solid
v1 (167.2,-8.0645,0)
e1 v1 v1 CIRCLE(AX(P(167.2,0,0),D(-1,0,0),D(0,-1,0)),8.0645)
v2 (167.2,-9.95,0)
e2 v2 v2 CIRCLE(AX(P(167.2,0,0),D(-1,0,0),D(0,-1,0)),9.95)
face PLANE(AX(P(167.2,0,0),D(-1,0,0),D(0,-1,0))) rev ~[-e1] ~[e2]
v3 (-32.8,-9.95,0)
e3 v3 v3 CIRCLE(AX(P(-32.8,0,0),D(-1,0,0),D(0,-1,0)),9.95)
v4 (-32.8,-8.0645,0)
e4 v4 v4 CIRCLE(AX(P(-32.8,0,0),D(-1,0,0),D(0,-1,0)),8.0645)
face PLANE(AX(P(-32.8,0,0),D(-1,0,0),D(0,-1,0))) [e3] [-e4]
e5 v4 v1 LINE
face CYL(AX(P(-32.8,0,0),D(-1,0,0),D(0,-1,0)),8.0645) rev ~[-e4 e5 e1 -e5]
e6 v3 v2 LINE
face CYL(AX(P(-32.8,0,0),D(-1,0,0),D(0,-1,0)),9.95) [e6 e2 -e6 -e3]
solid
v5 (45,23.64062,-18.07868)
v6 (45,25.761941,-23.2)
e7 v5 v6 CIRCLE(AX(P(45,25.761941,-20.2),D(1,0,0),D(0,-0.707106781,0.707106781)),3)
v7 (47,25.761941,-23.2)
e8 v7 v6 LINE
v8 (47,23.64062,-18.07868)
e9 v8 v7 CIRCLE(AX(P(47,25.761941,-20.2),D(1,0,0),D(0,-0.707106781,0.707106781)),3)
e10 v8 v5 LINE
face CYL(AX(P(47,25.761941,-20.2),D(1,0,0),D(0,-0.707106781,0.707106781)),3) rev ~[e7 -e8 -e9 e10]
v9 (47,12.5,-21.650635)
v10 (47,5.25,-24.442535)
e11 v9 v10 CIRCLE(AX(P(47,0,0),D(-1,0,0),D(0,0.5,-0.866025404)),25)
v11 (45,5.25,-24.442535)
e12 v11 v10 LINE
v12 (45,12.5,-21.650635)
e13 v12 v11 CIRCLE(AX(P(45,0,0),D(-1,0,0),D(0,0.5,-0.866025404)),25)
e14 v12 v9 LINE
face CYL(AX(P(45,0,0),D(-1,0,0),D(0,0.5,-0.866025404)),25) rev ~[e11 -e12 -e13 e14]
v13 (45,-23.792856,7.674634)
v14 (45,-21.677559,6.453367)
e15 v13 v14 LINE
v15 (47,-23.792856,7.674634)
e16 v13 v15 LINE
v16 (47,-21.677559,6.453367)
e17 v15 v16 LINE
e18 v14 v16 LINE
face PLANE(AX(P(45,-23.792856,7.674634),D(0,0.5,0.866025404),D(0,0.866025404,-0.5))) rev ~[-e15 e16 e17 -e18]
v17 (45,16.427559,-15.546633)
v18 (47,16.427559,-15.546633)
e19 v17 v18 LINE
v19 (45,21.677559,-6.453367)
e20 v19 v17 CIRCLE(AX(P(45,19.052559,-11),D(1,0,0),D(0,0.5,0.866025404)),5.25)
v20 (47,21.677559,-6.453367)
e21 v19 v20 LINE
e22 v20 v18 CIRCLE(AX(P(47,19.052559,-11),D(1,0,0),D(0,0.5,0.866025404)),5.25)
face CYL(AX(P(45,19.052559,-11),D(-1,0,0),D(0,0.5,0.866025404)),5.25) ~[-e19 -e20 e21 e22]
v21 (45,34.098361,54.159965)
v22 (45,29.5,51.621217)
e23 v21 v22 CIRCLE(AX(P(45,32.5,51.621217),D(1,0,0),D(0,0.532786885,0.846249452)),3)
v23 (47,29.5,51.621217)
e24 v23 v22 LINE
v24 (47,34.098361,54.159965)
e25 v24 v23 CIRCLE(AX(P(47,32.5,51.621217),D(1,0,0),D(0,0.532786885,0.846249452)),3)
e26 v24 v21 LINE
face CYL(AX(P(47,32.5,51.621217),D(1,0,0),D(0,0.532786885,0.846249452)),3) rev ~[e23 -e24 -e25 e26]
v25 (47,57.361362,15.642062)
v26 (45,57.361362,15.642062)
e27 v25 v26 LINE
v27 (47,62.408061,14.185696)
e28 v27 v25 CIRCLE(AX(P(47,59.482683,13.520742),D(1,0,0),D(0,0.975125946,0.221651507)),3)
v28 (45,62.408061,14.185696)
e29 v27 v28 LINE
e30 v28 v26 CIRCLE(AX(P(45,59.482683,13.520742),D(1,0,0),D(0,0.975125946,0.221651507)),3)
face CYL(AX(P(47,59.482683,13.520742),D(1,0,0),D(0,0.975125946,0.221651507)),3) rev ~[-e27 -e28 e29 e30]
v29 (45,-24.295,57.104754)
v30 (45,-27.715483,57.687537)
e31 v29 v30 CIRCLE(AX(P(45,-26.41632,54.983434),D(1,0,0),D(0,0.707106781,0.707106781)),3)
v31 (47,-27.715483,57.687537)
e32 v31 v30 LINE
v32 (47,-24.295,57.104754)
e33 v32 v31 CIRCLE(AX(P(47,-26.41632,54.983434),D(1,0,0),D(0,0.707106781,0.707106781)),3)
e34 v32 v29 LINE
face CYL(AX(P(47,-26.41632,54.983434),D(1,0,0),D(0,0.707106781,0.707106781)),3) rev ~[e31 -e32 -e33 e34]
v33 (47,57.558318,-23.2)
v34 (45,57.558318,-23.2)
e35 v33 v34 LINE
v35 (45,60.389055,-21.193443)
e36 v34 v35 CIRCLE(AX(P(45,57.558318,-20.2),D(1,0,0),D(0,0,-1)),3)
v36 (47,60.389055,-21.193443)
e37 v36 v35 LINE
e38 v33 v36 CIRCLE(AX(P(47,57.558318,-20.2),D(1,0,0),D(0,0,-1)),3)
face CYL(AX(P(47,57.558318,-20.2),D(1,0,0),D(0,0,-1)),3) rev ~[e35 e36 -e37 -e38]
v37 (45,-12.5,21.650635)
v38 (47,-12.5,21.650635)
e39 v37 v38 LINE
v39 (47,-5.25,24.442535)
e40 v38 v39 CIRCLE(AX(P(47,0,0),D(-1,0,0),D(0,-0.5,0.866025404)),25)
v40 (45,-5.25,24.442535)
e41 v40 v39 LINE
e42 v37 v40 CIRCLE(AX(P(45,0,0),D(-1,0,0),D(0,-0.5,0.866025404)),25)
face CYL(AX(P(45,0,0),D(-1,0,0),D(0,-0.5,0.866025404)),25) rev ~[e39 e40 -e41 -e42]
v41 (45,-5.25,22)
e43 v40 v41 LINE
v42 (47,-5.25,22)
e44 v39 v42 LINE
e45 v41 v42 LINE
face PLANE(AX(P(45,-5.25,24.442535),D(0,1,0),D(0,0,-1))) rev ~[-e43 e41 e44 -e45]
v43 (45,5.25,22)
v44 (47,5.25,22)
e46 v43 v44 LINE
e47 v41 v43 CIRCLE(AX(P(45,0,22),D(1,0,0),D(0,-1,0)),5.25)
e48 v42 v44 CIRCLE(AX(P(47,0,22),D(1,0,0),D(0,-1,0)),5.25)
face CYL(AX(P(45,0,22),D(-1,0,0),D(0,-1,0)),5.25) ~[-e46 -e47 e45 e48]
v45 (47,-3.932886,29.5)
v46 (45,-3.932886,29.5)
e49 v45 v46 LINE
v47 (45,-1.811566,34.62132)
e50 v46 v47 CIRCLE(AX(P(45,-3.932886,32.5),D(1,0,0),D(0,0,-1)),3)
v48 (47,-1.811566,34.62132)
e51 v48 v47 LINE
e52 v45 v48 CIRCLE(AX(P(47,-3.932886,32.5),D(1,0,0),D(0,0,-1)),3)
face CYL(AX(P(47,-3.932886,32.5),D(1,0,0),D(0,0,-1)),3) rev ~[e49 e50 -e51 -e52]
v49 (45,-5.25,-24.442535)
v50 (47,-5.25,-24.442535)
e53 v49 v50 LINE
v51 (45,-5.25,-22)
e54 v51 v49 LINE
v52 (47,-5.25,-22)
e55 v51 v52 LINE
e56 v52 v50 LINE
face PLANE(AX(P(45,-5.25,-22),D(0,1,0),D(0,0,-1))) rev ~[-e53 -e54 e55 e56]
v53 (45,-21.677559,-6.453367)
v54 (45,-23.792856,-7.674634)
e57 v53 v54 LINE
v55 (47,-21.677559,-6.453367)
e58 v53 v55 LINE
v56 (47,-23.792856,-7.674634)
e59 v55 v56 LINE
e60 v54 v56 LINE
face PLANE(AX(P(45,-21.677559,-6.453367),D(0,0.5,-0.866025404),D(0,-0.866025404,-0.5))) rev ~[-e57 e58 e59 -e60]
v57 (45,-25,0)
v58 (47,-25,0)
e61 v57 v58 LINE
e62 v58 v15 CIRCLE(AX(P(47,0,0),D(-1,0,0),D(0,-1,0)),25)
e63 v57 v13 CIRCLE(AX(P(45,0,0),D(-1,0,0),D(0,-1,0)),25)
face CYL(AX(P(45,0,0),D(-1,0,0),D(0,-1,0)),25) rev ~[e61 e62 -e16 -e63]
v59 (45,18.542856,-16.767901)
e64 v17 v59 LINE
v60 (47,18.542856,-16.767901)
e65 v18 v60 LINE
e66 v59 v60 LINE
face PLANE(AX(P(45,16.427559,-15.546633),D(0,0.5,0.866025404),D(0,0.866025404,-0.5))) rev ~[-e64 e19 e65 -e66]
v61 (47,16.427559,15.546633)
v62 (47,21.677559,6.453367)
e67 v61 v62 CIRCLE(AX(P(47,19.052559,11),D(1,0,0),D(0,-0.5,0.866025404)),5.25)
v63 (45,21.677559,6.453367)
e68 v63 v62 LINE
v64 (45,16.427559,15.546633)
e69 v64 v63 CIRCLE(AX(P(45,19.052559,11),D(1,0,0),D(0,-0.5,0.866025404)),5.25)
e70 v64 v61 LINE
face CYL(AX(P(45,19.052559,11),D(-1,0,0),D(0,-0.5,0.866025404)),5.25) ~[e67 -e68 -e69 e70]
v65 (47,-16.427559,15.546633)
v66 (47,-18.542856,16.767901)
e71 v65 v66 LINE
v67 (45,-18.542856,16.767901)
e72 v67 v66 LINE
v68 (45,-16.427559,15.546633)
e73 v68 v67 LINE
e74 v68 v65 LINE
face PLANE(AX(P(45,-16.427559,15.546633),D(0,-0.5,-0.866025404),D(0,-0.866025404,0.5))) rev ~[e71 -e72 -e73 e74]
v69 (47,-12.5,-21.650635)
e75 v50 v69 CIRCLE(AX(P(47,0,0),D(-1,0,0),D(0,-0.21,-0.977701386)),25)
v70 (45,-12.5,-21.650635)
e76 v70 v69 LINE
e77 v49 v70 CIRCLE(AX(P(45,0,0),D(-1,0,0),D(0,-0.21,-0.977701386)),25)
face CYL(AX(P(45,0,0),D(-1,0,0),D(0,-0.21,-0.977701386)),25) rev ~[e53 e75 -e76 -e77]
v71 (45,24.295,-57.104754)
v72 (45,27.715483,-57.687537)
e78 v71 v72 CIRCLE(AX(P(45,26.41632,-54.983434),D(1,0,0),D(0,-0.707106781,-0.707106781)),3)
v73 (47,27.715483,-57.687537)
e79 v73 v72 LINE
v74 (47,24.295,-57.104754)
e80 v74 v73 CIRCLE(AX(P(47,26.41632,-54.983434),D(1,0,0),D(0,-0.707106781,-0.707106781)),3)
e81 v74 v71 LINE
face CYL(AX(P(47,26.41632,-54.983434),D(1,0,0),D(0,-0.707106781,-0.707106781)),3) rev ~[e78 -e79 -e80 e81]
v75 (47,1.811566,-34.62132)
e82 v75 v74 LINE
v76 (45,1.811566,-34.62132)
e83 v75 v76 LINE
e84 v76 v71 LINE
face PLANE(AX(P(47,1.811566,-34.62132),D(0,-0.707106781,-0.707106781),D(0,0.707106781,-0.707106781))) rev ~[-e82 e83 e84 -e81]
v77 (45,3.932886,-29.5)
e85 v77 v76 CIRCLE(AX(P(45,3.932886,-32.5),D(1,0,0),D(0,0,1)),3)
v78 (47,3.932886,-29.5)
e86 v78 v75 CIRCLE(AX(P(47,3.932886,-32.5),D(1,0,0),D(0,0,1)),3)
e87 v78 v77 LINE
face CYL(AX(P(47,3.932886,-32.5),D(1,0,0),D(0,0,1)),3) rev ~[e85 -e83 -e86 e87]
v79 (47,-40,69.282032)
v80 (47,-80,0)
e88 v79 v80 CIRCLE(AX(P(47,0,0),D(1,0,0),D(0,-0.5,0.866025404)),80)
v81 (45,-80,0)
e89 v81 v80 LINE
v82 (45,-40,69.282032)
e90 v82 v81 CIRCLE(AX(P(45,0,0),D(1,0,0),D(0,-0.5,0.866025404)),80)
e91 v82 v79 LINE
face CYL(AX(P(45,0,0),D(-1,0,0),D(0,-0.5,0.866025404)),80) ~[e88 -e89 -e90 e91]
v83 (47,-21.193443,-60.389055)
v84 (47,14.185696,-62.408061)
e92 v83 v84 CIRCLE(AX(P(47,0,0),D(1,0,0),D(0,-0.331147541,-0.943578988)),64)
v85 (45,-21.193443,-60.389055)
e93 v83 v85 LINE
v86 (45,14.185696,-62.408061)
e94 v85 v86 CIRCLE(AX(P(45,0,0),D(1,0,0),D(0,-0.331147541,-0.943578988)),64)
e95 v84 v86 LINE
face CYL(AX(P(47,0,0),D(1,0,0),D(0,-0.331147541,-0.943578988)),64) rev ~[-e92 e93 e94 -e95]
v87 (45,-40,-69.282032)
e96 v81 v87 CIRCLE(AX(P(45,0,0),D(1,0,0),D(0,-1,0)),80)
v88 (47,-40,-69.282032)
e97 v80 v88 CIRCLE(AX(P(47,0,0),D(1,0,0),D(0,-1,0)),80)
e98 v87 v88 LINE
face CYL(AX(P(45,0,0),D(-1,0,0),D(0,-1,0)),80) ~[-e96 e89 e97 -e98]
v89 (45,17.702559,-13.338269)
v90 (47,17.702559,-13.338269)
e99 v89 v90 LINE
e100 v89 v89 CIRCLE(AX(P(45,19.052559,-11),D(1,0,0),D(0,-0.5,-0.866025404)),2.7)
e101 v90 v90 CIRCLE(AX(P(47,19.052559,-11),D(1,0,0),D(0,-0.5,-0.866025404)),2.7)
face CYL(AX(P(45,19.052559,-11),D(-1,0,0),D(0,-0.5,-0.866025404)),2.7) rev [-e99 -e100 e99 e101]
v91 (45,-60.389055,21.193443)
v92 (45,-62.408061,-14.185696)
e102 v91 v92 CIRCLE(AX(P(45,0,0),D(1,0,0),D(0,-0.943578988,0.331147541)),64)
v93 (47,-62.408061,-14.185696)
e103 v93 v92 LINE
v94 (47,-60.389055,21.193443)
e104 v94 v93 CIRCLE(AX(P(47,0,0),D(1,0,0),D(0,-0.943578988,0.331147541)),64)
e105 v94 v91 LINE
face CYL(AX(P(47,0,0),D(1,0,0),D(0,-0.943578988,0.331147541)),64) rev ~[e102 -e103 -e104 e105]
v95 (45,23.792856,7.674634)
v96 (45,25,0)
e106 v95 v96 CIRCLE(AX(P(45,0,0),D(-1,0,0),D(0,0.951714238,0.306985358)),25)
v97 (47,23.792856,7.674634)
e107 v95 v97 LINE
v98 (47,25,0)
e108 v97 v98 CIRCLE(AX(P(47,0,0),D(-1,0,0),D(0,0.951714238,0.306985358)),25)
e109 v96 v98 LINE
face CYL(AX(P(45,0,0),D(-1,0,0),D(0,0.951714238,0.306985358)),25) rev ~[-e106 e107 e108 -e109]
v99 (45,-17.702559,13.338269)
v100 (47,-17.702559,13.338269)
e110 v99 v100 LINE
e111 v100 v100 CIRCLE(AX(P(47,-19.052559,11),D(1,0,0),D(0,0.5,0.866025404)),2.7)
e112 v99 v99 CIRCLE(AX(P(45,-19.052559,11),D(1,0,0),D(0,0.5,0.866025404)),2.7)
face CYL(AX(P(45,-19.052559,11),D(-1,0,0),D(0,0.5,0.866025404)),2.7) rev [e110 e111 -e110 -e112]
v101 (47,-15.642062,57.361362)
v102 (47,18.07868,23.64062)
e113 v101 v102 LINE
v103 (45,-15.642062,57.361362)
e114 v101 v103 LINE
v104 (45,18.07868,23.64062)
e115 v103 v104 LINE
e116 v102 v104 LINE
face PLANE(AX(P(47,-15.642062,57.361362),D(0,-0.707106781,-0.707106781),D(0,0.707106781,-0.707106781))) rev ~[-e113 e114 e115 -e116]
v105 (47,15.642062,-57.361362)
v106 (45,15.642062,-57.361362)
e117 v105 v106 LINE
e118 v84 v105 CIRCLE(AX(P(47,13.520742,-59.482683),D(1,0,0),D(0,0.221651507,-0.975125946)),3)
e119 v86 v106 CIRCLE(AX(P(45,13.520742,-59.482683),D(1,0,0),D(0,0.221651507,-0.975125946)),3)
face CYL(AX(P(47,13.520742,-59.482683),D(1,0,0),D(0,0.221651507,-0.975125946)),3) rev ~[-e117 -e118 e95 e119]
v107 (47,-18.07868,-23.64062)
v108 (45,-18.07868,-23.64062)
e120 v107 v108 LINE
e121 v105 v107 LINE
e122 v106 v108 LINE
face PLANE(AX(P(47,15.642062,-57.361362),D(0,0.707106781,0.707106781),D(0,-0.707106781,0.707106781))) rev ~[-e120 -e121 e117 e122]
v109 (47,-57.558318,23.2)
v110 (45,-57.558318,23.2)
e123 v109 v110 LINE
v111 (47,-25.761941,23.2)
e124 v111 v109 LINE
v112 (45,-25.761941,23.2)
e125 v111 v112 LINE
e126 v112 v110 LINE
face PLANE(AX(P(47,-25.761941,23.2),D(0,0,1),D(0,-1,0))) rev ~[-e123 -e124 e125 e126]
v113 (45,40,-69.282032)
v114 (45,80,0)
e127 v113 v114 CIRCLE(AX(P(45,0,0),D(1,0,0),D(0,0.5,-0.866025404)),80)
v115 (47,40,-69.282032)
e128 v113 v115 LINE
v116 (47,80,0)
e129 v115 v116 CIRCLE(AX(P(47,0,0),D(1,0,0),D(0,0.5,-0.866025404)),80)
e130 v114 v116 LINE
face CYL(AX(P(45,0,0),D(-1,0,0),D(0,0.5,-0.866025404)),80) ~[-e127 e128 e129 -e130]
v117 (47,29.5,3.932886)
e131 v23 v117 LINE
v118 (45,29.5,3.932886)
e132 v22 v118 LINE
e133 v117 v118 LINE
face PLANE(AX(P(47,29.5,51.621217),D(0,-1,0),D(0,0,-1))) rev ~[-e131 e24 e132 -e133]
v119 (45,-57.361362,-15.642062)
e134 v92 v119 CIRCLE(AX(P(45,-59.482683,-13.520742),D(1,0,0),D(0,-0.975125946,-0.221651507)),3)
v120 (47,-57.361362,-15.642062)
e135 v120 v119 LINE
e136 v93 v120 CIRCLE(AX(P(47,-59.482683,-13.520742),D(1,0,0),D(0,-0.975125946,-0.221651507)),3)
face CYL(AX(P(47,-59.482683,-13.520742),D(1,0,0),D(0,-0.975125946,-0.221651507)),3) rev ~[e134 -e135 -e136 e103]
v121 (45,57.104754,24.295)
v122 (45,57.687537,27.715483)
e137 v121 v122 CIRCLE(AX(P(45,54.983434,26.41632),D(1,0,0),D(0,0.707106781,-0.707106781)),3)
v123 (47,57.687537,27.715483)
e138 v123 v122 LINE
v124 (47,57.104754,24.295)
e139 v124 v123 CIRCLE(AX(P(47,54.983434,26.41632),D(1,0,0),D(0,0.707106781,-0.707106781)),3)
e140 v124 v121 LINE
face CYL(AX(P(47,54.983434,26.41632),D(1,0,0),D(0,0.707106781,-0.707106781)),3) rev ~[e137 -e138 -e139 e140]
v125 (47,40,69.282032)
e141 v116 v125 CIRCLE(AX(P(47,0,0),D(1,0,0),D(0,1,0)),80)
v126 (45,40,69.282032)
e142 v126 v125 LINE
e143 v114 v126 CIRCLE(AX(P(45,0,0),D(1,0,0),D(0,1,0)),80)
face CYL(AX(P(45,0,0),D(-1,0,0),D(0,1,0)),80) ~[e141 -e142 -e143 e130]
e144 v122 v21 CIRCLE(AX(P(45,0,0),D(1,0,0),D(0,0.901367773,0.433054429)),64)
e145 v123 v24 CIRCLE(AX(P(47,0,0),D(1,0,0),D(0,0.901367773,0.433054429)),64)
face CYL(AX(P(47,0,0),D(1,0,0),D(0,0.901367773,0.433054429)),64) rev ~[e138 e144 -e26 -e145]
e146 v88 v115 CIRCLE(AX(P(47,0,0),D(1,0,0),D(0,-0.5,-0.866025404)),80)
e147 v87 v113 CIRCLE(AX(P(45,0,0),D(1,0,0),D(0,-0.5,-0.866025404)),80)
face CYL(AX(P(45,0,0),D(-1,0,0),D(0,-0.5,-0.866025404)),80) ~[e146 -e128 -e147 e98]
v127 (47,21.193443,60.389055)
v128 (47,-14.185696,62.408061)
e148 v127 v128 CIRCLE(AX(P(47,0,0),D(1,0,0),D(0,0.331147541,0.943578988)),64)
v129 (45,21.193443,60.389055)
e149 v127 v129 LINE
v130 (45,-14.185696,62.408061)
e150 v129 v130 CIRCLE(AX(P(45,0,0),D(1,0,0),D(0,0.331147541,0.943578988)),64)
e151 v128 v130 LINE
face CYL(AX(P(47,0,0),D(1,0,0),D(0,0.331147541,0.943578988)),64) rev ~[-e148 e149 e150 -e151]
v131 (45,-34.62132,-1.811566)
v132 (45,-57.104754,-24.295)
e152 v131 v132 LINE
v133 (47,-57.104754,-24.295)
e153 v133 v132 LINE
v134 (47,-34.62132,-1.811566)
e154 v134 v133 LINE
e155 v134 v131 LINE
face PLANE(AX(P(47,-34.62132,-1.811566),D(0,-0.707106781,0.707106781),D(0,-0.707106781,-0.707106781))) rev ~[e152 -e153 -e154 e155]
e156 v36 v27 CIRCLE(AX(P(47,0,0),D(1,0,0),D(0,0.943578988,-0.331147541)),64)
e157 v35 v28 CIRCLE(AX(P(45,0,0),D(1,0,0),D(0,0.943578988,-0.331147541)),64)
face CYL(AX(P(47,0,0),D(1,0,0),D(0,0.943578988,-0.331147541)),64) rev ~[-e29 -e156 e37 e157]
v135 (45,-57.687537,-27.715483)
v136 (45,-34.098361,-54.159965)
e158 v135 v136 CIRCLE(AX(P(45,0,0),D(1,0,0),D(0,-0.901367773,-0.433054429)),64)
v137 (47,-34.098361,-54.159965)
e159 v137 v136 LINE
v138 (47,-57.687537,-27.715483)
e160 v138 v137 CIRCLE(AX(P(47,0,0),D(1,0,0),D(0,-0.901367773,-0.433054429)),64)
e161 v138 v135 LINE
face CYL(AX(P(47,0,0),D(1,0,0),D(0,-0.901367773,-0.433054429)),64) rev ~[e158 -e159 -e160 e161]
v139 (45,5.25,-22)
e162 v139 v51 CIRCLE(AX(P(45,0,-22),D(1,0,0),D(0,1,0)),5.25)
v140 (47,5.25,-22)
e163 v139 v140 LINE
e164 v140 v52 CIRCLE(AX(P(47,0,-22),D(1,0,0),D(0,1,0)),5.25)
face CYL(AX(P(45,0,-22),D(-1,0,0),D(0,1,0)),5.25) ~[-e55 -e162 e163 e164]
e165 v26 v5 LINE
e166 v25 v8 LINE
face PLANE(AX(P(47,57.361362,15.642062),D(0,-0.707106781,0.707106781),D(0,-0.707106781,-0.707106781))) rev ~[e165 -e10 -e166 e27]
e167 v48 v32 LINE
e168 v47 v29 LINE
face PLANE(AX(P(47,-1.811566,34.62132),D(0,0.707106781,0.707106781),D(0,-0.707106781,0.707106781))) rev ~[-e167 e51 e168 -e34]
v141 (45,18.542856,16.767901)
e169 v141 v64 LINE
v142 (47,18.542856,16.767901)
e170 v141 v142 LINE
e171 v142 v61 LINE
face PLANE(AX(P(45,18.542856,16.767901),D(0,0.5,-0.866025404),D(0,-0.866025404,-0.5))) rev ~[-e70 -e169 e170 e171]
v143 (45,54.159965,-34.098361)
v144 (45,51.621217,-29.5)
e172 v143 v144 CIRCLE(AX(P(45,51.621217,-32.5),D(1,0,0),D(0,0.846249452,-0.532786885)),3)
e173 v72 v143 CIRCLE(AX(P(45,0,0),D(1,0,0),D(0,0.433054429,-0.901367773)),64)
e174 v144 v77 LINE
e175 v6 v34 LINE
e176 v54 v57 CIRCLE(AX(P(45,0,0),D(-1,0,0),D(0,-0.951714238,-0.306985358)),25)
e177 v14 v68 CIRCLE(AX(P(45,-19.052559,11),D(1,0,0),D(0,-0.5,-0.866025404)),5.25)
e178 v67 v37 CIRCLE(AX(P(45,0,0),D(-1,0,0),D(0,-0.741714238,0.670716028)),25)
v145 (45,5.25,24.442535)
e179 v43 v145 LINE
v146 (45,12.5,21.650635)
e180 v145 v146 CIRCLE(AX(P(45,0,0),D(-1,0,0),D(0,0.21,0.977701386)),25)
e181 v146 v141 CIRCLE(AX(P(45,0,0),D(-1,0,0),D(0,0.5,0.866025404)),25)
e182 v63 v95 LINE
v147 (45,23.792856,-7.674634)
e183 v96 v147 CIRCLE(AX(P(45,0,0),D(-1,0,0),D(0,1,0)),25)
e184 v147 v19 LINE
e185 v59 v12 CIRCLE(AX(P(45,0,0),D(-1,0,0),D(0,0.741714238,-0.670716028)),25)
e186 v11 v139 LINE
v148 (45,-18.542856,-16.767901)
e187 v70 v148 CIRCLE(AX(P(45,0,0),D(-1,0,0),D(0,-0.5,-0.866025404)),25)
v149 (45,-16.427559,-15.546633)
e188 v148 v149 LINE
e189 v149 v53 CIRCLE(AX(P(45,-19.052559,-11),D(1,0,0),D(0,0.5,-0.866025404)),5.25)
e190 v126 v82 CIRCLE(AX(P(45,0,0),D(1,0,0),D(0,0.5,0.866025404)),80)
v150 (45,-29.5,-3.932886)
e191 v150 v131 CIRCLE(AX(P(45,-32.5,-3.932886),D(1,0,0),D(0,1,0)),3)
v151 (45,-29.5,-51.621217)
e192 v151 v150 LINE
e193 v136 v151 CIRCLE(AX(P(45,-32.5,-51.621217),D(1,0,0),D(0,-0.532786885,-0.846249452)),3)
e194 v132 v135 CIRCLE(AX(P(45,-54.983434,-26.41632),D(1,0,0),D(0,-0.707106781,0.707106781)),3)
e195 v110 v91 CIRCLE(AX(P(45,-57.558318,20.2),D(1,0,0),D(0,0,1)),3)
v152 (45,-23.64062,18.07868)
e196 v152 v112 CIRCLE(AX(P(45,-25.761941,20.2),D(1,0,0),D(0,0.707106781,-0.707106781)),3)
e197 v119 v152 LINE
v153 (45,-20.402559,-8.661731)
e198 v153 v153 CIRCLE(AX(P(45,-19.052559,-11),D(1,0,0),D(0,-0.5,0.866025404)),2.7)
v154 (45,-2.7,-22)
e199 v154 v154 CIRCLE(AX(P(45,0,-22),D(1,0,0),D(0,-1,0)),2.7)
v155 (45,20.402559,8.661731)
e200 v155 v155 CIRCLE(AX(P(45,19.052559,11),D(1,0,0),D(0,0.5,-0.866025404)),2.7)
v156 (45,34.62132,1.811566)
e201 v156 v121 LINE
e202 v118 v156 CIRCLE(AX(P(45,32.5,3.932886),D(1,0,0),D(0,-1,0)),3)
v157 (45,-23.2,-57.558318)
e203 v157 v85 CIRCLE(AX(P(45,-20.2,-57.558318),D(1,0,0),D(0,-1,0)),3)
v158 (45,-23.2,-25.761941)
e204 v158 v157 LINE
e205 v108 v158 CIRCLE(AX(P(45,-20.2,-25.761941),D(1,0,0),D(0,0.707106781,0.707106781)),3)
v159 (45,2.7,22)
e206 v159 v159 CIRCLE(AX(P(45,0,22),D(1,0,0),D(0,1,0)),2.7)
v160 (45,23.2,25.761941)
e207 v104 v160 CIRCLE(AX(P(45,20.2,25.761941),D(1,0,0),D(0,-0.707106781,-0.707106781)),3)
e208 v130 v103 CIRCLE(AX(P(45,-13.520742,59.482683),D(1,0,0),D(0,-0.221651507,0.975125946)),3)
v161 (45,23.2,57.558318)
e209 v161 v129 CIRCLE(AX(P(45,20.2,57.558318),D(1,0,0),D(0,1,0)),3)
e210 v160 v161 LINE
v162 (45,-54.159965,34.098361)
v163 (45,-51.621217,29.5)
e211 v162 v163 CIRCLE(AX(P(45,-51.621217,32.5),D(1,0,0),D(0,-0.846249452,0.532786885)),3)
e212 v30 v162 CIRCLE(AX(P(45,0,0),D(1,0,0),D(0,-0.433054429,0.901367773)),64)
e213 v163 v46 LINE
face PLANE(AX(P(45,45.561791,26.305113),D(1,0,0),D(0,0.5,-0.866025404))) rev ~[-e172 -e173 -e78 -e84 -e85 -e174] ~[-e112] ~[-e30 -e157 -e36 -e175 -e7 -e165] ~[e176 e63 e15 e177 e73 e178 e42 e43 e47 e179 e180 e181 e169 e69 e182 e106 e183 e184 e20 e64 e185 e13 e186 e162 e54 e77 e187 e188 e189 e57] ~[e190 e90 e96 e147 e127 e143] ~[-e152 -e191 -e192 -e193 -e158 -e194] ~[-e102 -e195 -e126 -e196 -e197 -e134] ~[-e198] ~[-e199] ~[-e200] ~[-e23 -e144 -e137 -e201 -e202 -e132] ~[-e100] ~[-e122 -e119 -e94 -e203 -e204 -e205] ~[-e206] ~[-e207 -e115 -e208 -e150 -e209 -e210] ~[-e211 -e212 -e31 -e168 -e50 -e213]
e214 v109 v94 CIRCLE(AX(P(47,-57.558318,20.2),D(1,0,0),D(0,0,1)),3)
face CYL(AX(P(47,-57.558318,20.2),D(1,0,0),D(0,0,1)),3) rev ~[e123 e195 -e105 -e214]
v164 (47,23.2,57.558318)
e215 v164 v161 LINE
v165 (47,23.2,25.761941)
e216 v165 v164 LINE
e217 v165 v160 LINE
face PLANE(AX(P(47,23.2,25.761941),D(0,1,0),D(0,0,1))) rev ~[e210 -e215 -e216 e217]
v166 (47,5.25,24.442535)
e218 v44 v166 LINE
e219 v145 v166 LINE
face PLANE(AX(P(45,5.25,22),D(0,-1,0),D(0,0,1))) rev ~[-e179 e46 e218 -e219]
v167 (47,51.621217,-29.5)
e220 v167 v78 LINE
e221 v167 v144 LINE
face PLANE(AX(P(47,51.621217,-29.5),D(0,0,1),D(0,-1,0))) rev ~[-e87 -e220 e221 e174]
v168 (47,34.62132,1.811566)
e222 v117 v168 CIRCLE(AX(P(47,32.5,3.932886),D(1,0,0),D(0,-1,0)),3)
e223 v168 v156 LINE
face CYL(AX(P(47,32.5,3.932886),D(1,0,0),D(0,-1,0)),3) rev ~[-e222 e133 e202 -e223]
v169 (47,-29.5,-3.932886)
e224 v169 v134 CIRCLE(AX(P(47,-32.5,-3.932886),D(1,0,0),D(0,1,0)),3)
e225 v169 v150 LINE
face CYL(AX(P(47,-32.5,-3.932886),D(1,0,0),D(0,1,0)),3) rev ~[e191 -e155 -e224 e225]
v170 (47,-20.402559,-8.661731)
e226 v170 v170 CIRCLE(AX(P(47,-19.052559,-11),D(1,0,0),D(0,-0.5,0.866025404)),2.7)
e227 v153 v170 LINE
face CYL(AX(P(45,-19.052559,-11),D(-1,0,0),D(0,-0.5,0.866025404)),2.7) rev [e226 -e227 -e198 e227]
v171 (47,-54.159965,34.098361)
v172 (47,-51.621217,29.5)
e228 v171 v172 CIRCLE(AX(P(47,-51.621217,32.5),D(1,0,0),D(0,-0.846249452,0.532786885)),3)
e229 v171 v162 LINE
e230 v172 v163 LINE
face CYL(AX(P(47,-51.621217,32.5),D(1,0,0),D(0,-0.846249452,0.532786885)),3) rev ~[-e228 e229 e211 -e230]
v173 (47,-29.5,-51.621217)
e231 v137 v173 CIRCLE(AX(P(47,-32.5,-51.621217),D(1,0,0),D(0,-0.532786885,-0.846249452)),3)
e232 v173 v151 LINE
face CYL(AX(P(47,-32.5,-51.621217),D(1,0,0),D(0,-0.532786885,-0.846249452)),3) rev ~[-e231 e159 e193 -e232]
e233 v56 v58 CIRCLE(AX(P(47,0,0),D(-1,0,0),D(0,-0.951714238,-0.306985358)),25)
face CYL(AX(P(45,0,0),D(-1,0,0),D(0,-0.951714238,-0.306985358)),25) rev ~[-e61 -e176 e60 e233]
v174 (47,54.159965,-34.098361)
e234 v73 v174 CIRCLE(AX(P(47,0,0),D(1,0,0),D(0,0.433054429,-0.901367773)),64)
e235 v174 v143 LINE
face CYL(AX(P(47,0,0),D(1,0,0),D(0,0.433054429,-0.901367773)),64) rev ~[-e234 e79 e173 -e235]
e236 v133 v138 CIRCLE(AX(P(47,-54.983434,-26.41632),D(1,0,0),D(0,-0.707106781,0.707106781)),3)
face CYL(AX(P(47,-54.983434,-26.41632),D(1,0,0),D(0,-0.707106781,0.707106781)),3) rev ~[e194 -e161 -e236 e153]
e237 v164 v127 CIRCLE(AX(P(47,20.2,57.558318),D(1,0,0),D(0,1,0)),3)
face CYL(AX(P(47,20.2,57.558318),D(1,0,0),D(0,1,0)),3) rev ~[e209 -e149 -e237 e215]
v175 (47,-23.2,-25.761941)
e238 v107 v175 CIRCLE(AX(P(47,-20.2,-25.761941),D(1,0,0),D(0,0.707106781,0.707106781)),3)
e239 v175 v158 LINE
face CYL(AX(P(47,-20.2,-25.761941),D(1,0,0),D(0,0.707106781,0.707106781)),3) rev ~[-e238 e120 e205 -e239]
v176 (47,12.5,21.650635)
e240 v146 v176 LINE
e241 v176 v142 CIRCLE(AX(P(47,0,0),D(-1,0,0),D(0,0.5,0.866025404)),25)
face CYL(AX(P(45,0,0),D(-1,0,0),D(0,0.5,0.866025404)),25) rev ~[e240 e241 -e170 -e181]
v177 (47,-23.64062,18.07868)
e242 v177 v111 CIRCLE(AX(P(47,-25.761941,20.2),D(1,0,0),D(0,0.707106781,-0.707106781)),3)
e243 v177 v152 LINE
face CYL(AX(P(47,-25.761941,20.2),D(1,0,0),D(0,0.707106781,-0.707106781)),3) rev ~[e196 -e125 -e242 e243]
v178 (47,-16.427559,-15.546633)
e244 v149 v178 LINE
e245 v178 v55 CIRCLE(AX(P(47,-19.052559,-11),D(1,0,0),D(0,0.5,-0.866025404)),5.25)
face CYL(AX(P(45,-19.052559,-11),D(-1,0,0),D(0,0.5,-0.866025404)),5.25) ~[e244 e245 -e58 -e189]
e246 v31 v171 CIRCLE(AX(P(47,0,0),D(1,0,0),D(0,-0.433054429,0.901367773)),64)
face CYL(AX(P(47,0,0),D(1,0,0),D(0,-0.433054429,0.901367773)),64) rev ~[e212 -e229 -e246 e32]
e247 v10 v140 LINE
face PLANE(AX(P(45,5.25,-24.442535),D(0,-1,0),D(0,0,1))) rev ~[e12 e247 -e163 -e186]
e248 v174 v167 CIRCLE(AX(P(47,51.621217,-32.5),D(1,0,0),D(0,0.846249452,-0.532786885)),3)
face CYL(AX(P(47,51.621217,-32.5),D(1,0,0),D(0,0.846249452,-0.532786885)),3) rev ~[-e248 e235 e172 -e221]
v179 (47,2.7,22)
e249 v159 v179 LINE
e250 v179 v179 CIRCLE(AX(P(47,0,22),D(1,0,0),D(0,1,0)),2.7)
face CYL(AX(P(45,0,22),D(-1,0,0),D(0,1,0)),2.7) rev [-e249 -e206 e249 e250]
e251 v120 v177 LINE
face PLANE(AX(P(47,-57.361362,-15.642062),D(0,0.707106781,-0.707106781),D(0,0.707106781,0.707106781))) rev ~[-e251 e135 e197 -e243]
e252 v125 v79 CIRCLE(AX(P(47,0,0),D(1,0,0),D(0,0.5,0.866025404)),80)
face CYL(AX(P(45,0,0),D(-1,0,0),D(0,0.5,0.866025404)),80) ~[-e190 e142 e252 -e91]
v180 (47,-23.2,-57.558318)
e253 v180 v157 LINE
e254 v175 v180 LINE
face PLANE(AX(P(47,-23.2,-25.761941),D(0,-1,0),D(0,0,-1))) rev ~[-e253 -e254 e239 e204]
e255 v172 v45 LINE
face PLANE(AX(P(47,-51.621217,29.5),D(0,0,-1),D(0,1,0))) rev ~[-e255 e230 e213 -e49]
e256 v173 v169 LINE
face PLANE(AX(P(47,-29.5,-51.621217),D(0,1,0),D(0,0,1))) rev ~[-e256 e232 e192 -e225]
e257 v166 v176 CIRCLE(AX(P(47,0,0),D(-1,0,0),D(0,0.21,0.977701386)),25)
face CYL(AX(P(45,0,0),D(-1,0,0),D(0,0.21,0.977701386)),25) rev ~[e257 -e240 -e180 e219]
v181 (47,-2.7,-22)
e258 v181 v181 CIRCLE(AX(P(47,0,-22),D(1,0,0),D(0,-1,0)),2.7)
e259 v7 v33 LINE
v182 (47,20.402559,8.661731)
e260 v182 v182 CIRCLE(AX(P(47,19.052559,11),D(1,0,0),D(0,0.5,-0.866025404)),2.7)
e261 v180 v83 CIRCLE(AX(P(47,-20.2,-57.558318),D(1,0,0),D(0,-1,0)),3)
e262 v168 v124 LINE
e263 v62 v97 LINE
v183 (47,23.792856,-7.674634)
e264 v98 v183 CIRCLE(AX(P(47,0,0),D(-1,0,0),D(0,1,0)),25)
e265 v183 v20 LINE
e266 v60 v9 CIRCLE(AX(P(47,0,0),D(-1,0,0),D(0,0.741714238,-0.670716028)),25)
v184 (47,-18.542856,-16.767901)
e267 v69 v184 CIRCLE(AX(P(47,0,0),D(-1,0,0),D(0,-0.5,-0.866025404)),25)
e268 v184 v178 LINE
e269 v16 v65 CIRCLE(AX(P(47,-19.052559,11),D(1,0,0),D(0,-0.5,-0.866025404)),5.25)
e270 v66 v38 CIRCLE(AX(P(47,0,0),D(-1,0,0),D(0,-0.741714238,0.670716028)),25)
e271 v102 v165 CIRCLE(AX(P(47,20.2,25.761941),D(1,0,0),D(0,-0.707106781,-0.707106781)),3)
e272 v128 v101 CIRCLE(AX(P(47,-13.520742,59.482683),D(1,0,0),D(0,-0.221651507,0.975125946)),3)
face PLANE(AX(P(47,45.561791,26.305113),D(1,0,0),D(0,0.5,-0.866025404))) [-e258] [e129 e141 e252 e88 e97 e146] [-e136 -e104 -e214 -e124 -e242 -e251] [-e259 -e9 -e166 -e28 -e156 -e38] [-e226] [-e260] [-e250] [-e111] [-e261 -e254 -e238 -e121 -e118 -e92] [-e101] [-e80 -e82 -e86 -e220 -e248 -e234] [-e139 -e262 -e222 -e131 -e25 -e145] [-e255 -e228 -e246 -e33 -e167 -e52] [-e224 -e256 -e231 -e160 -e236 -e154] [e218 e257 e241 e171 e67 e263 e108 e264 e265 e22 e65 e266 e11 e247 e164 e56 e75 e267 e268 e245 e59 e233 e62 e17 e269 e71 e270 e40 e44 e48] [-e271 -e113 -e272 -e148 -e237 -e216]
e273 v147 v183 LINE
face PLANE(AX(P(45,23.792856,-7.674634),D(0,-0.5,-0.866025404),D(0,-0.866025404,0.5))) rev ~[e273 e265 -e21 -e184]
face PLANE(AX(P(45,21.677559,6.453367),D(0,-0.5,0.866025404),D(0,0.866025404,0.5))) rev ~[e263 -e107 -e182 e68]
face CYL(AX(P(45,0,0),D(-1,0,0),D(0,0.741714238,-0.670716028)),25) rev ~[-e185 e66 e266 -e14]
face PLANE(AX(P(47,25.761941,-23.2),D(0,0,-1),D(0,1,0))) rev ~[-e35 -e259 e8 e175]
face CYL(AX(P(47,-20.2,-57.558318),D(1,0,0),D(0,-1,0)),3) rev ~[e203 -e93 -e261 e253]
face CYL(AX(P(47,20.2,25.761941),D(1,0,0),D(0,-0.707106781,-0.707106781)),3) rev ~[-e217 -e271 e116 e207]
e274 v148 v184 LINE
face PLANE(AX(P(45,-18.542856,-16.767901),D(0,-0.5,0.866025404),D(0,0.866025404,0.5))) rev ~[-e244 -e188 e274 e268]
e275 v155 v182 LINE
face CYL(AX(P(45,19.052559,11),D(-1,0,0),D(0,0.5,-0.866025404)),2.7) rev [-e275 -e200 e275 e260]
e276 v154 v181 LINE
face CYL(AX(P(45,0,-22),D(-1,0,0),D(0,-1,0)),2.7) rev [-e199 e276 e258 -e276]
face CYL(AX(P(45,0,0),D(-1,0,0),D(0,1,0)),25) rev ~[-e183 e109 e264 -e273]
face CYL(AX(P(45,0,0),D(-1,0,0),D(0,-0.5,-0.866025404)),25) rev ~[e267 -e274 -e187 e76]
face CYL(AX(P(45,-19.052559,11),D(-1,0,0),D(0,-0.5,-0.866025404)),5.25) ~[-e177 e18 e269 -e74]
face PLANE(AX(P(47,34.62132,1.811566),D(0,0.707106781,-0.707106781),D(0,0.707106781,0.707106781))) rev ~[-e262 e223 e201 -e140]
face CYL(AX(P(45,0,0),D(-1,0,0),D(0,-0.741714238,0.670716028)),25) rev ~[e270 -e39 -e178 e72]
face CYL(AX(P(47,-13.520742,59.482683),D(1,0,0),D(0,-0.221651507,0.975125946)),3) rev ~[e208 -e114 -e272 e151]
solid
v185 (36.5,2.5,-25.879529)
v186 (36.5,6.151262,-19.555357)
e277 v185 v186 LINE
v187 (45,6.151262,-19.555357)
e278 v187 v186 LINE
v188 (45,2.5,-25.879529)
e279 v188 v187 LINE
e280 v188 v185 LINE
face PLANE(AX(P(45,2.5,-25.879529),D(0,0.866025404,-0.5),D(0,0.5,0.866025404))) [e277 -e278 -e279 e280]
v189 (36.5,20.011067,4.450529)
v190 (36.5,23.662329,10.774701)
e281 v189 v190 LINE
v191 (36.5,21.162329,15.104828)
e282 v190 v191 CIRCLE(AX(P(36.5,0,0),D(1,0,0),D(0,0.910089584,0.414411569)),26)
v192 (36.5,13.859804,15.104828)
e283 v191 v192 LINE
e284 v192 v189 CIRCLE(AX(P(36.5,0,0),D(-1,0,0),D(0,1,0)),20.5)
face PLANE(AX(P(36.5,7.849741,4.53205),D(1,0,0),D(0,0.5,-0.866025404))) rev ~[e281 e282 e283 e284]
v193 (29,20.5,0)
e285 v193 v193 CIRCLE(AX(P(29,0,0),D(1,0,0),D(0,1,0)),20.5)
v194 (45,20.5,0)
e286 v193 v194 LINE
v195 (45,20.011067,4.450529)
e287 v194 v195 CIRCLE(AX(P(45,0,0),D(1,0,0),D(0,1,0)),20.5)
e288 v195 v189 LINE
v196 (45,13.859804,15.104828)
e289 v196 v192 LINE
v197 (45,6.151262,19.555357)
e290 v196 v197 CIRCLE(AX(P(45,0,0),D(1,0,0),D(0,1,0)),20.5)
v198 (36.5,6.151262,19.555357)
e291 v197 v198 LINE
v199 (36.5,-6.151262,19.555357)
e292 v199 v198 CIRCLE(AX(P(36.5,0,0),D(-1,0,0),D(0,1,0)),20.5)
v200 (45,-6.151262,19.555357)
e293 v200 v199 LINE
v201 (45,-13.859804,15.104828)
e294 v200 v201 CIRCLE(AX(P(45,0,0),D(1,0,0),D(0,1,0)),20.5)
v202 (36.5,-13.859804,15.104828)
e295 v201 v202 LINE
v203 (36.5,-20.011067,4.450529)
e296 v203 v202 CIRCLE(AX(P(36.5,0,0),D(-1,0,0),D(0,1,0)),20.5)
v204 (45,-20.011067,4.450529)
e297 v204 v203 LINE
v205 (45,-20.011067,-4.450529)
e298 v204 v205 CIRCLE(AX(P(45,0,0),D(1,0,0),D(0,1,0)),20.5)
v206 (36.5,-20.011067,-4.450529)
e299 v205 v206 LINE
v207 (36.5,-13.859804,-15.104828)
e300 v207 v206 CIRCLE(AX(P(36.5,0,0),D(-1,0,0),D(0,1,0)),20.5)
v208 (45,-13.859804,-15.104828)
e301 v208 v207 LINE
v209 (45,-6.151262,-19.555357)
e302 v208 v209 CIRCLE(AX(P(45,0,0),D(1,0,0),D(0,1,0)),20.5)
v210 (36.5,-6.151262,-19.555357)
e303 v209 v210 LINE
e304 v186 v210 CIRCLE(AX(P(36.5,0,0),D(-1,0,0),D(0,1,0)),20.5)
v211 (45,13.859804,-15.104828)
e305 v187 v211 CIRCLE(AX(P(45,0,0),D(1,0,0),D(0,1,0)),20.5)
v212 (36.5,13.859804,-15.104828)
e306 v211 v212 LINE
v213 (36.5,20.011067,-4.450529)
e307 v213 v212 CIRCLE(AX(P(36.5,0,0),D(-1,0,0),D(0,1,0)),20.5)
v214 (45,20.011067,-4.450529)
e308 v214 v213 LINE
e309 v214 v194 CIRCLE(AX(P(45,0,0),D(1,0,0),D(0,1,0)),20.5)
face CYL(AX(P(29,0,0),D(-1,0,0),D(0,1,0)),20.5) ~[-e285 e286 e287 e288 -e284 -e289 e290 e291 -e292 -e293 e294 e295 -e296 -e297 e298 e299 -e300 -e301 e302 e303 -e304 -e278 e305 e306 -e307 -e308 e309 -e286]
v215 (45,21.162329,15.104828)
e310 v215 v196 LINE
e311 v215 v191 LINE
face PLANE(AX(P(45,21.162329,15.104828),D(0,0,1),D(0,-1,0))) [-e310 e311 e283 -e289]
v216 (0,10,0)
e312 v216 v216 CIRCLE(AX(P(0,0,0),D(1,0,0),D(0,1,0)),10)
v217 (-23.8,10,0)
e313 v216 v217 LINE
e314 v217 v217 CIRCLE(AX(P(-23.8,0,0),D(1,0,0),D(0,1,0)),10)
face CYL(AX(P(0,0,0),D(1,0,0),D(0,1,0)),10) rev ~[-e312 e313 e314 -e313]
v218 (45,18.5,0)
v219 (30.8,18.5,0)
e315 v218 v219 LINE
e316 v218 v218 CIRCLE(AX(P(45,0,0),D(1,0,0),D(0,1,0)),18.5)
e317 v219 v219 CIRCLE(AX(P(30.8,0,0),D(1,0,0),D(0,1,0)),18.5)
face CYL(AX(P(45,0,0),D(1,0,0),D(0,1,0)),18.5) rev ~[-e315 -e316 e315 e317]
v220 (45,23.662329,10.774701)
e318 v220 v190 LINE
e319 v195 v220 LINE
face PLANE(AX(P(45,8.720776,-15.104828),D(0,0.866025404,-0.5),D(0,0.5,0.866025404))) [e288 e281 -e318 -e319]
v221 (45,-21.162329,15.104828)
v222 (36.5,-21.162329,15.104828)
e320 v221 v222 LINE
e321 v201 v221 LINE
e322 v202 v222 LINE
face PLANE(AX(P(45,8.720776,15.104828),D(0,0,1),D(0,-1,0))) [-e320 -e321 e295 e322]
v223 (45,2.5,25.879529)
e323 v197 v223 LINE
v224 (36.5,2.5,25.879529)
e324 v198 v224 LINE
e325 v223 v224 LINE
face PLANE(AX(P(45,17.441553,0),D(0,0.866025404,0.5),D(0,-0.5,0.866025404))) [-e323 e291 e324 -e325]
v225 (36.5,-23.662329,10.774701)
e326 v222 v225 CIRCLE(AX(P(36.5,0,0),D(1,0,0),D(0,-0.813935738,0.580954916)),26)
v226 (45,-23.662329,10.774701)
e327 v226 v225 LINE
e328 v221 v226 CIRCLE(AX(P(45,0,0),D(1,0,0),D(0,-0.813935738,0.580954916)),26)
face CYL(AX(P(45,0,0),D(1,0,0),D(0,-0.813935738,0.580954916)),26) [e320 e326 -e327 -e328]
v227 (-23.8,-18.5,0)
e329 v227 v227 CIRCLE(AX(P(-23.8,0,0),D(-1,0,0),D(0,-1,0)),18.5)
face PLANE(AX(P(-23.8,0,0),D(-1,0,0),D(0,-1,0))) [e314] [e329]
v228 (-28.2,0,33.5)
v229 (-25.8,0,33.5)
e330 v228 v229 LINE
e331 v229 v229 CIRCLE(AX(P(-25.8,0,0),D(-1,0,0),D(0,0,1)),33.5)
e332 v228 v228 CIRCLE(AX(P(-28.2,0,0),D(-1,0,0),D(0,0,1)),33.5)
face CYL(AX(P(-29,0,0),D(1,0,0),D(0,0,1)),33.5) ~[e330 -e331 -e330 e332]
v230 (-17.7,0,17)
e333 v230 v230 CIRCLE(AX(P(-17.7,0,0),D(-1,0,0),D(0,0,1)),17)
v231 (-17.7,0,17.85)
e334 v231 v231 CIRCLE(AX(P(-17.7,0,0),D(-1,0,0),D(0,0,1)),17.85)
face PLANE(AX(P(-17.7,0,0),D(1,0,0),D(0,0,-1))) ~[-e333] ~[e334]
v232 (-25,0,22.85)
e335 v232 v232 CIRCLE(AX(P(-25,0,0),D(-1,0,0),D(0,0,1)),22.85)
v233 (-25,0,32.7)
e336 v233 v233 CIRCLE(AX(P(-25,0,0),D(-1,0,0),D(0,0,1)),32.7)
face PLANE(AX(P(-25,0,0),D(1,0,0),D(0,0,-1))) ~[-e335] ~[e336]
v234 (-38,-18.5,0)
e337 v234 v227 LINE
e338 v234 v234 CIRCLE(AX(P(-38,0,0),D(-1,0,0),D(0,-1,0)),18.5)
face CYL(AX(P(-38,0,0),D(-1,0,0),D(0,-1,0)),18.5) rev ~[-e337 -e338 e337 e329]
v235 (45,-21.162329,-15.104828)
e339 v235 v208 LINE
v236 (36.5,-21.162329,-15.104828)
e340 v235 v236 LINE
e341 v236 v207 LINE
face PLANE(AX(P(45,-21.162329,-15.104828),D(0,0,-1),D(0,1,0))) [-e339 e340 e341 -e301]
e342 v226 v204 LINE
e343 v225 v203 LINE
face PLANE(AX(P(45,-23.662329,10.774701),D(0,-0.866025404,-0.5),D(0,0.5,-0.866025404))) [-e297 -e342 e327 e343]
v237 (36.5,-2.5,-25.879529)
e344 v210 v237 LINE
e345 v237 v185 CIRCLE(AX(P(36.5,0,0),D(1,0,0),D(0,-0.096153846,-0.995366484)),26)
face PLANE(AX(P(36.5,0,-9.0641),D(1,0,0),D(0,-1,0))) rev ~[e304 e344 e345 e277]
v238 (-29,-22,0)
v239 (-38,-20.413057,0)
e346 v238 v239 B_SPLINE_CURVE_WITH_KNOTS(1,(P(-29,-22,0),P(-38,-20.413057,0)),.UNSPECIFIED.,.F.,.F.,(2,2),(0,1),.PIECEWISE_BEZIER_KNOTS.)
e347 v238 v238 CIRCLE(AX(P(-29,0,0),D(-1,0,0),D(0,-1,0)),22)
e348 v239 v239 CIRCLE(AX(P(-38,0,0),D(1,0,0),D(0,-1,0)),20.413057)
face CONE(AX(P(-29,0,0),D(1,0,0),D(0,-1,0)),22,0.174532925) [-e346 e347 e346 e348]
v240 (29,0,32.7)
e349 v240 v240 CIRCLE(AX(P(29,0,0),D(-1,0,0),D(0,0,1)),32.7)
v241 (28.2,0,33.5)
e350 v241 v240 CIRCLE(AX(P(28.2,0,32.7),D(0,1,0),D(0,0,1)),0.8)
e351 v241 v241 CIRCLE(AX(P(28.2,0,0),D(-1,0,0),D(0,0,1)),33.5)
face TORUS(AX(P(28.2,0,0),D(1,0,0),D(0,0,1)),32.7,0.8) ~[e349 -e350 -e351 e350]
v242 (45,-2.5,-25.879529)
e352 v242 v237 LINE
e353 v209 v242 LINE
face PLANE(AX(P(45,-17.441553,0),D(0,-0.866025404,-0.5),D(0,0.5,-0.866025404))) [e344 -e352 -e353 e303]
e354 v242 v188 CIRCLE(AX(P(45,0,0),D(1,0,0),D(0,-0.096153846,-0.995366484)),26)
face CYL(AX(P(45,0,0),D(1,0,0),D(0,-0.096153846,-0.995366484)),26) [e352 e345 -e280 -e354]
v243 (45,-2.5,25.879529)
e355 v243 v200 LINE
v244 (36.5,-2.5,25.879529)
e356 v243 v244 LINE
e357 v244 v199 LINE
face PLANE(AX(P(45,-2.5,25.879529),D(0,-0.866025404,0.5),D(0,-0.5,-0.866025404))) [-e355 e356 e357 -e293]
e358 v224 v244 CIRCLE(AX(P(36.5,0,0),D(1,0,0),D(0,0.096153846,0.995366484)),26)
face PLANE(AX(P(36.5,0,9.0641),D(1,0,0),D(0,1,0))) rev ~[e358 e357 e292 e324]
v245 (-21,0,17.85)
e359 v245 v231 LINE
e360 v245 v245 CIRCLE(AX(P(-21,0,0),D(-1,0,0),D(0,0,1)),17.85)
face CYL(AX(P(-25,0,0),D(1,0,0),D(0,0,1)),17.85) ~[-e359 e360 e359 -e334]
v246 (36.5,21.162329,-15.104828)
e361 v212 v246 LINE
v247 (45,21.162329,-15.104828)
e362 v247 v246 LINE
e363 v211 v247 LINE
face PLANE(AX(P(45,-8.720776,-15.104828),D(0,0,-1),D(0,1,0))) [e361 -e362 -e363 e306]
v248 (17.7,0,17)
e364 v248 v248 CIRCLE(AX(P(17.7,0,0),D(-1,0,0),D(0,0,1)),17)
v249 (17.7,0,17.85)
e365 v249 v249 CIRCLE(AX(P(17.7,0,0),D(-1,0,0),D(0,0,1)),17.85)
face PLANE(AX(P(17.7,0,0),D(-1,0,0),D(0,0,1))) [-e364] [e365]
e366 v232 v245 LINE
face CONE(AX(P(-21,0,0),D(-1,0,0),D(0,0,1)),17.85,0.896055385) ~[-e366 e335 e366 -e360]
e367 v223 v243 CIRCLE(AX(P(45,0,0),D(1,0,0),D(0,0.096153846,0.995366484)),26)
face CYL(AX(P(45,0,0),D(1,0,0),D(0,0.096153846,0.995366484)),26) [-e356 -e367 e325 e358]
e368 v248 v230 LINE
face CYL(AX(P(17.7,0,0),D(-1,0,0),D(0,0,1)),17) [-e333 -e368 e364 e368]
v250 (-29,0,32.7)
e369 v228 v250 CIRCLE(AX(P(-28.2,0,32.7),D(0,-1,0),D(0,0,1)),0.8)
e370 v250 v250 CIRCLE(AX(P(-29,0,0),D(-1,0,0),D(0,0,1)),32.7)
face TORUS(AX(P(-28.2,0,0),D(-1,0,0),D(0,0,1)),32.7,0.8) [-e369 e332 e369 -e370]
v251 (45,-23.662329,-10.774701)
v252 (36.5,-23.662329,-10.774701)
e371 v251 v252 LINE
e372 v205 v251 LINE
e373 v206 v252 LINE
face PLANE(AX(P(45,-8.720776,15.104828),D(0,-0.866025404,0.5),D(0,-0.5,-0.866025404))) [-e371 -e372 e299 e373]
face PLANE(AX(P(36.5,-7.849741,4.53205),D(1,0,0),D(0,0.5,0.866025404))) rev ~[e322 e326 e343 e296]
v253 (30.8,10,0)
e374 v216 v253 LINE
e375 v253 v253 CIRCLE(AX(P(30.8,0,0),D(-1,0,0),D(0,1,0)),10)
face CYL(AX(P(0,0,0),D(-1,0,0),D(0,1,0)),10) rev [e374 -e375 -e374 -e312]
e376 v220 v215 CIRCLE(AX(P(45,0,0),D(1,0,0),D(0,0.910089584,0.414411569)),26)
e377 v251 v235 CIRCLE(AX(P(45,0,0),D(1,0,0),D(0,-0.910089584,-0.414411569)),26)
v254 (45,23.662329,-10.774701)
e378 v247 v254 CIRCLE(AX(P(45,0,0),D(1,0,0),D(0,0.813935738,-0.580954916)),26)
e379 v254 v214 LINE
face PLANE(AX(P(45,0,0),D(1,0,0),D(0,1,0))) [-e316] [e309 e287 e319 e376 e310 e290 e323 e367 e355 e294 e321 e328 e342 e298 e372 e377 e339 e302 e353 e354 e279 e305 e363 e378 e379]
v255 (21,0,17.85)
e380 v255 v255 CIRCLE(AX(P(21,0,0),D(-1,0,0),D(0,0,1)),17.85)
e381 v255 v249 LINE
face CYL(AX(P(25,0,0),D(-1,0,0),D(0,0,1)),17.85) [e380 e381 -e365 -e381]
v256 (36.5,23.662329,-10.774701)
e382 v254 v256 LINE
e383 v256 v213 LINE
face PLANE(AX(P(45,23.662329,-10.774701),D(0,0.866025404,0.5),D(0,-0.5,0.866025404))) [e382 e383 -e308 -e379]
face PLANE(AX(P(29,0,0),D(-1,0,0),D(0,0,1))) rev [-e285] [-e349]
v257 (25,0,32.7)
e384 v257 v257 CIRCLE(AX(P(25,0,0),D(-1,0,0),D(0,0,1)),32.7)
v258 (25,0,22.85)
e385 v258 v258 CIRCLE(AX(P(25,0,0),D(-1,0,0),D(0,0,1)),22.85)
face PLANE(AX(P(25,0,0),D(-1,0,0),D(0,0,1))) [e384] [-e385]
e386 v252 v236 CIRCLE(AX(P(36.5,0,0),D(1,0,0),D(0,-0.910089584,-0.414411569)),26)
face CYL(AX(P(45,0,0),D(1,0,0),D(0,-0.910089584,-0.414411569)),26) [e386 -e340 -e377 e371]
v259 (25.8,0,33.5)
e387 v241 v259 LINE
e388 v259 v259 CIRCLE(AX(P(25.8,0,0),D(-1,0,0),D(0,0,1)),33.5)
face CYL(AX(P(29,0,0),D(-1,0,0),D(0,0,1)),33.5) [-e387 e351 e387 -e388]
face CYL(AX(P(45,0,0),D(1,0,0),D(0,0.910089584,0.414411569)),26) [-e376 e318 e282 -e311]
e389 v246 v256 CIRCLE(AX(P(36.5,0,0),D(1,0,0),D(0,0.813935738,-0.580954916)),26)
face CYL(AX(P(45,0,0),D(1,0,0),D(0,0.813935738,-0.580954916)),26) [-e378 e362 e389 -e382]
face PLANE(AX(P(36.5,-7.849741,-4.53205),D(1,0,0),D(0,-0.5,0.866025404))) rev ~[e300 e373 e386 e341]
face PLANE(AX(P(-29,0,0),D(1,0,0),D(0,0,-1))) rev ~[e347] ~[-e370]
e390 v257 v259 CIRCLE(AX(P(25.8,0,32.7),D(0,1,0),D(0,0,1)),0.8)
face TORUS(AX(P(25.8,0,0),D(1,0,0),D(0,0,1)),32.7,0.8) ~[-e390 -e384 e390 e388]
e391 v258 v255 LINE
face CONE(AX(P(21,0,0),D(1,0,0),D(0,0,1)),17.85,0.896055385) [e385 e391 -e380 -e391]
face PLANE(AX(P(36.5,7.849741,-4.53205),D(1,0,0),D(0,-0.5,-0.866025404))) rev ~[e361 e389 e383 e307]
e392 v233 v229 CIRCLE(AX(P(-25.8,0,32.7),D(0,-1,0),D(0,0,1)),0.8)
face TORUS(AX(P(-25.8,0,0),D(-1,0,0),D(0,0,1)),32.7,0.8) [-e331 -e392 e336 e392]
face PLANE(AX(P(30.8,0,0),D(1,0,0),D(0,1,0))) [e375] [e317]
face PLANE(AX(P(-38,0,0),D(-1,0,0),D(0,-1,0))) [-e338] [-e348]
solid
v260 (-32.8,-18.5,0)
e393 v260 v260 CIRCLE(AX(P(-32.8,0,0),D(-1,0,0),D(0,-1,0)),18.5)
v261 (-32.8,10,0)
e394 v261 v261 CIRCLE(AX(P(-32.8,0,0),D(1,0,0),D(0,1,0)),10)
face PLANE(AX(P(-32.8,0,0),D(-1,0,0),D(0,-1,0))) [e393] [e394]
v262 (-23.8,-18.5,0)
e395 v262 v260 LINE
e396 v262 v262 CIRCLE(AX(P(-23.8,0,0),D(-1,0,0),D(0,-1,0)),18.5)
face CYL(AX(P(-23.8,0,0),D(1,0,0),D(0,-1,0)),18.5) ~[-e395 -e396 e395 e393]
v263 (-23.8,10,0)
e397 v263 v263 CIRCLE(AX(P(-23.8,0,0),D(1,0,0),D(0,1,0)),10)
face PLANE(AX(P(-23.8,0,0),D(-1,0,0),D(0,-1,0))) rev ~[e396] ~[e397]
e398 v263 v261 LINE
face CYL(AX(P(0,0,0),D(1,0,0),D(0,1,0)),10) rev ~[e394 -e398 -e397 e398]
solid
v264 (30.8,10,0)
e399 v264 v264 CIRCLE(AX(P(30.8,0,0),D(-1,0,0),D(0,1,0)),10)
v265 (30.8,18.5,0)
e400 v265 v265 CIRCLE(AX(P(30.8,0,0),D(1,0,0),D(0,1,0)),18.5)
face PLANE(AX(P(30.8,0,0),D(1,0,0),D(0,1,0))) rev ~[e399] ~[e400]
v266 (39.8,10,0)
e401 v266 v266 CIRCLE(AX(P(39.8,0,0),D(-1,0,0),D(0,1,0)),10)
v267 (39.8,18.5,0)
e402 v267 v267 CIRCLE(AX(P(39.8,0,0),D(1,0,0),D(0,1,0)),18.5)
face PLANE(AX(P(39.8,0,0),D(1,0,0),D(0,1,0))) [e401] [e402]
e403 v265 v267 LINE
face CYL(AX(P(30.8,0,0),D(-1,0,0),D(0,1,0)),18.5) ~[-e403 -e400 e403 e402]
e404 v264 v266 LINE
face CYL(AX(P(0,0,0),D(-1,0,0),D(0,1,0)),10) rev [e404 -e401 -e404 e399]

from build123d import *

# Parameters (mm, degrees)
F2_SIZE2       = 4
F2_SIZE        = 5
F3_R           = 0.8
F5_R           = 20.5
F6_DEPTH       = 16
F8_DEPTH       = 8.5
F9_COUNT       = 6
F10_R          = 18.5
F11_DEPTH      = 14.2
F12_DEPTH      = 9
F13_R          = 22
F14_DEPTH      = 9
F14_TAPER      = 10
F15_R          = 18.5
F16_DEPTH      = 14.2
F17_DEPTH      = 9
F18_R          = 10
F19_DEPTH      = 38.0010001
F19_DEPTH_BACK = 45.001
F20_R          = 2.7
F21_DEPTH      = 2
F22_COUNT      = 6
F24_DEPTH      = 85.0010001
F25_COUNT      = 8
F26_R          = 9.95
F26_R_2        = 8.0645
F27_DEPTH      = 200


with BuildPart() as f1:
    # F0 (on Front) → F1 (revolve)
    with BuildSketch(Plane.XZ):
        Polygon((0, 17), (0, 0), (29, 0), (29, 33.5), (25, 33.5), (25, 17.85), (17.7, 17.85), (17.7, 17), align=None)
    revolve(axis=Axis((-10.4847326972, 0, 0), (-1, 0, 0)))

    # F2
    f2_edges = [f1.edges().sort_by_distance(p)[0] for p in [
        (25, 0, -17.85),
    ]]
    chamfer(f2_edges, length=F2_SIZE, length2=F2_SIZE2)

    # F3
    f3_edges = [f1.edges().sort_by_distance(p)[0] for p in [
        (25, 0, -33.5),
        (29, 0, -33.5),
    ]]
    fillet(f3_edges, radius=F3_R)

    # F4: F1 across face


with BuildPart() as f1_1:
    add(f1.part)
    add(f1.part.mirror(Plane(origin=(0, 0, 0), x_dir=(0, -1, 0), z_dir=(-1, 0, 0))))

    # F5 (on face) → F6 (join)
    with BuildSketch(Plane.YZ.offset(29)):
        Circle(F5_R)
    extrude(amount=F6_DEPTH)

    # F7 (on face) → F8 (join)
    with BuildSketch(Plane.YZ.offset(45)):
        with BuildLine():
            Line((17.4415527975, 0), (2.5, 25.8795285892))
            ThreePointArc((2.5, 25.8795285892), (0, 26), (-2.5, 25.8795285892))
            Line((-2.5, 25.8795285892), (-17.4415527975, 0))
            Line((-17.4415527975, 0), (17.4415527975, 0))
        make_face()
    f8 = extrude(amount=-F8_DEPTH)

    # F9: F8 ×6 about axis
    f9_axis = Axis((14.5, 0, 0), (1, 0, 0))
    for i in range(1, F9_COUNT):
        add(f8.rotate(f9_axis, i * 360 / F9_COUNT))

    # F10 (on face) → F11 (cut)
    with BuildSketch(Plane.YZ.offset(45)):
        Circle(F10_R)
    extrude(amount=-F11_DEPTH, mode=Mode.SUBTRACT)


with BuildPart() as f12:
    # F12 (new): a face of the model
    f12_faces = [f1_1.part.faces().sort_by_distance(p)[0] for p in [
        (30.8, 0, 0),
    ]]
    extrude(f12_faces, amount=F12_DEPTH)


with BuildPart() as f1_2:
    add(f1_1.part)

    # F13 (on face) → F14 (join)
    with BuildSketch(Plane(origin=(-29, 0, 0), x_dir=(0, -1, 0), z_dir=(-1, 0, 0))):
        Circle(F13_R)
    extrude(amount=F14_DEPTH, taper=F14_TAPER)

    # F15 (on face) → F16 (cut)
    with BuildSketch(Plane(origin=(-38, 0, 0), x_dir=(0, -1, 0), z_dir=(-1, 0, 0))):
        Circle(F15_R)
    extrude(amount=-F16_DEPTH, mode=Mode.SUBTRACT)


with BuildPart() as f17:
    # F17 (new): a face of the model
    f17_faces = [f1_2.part.faces().sort_by_distance(p)[0] for p in [
        (-23.8, 0, 0),
    ]]
    extrude(f17_faces, amount=F17_DEPTH)


with BuildPart() as f19_tool:
    # F18 (on Right) → F19 (new body, two sides)
    with BuildSketch(Plane.YZ) as f19_sk:
        Circle(F18_R)
    extrude(amount=-F19_DEPTH)
    extrude(f19_sk.sketch, amount=F19_DEPTH_BACK)


with BuildPart() as f1_3:
    add(f1_2.part)

    # F19: cut by f19_tool
    add(f19_tool.part, mode=Mode.SUBTRACT)


with BuildPart() as f12_1:
    add(f12.part)

    # F19: cut by f19_tool
    add(f19_tool.part, mode=Mode.SUBTRACT)


with BuildPart() as f17_1:
    add(f17.part)

    # F19: cut by f19_tool
    add(f19_tool.part, mode=Mode.SUBTRACT)


with BuildPart() as f21:
    # F20 (on face) → F21 (new body)
    with BuildSketch(Plane.YZ.offset(45)):
        with BuildLine():
            ThreePointArc((-12.5, 21.6506350946), (-8.9841138004, 23.329931402), (-5.25, 24.4425346476))
            Line((-5.25, 24.4425346476), (-5.25, 22))
            ThreePointArc((-5.25, 22), (0, 16.75), (5.25, 22))
            Line((5.25, 22), (5.25, 24.4425346476))
            ThreePointArc((5.25, 24.4425346476), (8.9841138004, 23.329931402), (12.5, 21.6506350946))
            Line((12.5, 21.6506350946), (40, 69.2820323028))
            ThreePointArc((40, 69.2820323028), (0, 80), (-40, 69.2820323028))
            Line((-40, 69.2820323028), (-12.5, 21.6506350946))
        make_face()
        with Locations((0, 22)):
            Circle(F20_R, mode=Mode.SUBTRACT)
    extrude(amount=F21_DEPTH)

    # F22: F21 ×6 about axis
    f22_axis = Axis((14.5, 0, 0), (1, 0, 0))


with BuildPart() as f21_1:
    add(f21.part)
    for i in range(1, F22_COUNT):
        add(f21.part.rotate(f22_axis, i * 360 / F22_COUNT))

    # F23 (on face) → F24 (cut, through all)
    with BuildSketch(Plane.YZ.offset(47)):
        with BuildLine():
            ThreePointArc((-54.1599649242, 34.0983606557), (-54.2475335682, 31.0500141323), (-51.6212165684, 29.5))
            Line((-51.6212165684, 29.5), (-3.9328860401, 29.5))
            ThreePointArc((-3.9328860401, 29.5), (-1.1612474425, 31.3519497029), (-1.8115656965, 34.6213203436))
            Line((-1.8115656965, 34.6213203436), (-24.2949998262, 57.1047544732))
            ThreePointArc((-24.2949998262, 57.1047544732), (-25.9124406651, 57.940815648), (-27.7154834568, 57.6875374475))
            ThreePointArc((-27.7154834568, 57.6875374475), (-42.6029292106, 47.7597154794), (-54.1599649242, 34.0983606557))
        make_face()
    f24 = extrude(amount=-F24_DEPTH, mode=Mode.SUBTRACT)

    # F25: F24 ×8 about axis
    f25_axis = Axis((14.5, 0, 0), (1, 0, 0))
    for i in range(1, F25_COUNT):
        add(f24.rotate(f25_axis, i * 360 / F25_COUNT), mode=Mode.SUBTRACT)


with BuildPart() as f27:
    # F26 (on face) → F27 (new body)
    with BuildSketch(Plane(origin=(-32.8, 0, 0), x_dir=(0, -1, 0), z_dir=(-1, 0, 0))):
        Circle(F26_R)
        Circle(F26_R_2, mode=Mode.SUBTRACT)
    extrude(amount=-F27_DEPTH)


solid = Compound([f1_3.part, f12_1.part, f17_1.part, f21_1.part, f27.part])
